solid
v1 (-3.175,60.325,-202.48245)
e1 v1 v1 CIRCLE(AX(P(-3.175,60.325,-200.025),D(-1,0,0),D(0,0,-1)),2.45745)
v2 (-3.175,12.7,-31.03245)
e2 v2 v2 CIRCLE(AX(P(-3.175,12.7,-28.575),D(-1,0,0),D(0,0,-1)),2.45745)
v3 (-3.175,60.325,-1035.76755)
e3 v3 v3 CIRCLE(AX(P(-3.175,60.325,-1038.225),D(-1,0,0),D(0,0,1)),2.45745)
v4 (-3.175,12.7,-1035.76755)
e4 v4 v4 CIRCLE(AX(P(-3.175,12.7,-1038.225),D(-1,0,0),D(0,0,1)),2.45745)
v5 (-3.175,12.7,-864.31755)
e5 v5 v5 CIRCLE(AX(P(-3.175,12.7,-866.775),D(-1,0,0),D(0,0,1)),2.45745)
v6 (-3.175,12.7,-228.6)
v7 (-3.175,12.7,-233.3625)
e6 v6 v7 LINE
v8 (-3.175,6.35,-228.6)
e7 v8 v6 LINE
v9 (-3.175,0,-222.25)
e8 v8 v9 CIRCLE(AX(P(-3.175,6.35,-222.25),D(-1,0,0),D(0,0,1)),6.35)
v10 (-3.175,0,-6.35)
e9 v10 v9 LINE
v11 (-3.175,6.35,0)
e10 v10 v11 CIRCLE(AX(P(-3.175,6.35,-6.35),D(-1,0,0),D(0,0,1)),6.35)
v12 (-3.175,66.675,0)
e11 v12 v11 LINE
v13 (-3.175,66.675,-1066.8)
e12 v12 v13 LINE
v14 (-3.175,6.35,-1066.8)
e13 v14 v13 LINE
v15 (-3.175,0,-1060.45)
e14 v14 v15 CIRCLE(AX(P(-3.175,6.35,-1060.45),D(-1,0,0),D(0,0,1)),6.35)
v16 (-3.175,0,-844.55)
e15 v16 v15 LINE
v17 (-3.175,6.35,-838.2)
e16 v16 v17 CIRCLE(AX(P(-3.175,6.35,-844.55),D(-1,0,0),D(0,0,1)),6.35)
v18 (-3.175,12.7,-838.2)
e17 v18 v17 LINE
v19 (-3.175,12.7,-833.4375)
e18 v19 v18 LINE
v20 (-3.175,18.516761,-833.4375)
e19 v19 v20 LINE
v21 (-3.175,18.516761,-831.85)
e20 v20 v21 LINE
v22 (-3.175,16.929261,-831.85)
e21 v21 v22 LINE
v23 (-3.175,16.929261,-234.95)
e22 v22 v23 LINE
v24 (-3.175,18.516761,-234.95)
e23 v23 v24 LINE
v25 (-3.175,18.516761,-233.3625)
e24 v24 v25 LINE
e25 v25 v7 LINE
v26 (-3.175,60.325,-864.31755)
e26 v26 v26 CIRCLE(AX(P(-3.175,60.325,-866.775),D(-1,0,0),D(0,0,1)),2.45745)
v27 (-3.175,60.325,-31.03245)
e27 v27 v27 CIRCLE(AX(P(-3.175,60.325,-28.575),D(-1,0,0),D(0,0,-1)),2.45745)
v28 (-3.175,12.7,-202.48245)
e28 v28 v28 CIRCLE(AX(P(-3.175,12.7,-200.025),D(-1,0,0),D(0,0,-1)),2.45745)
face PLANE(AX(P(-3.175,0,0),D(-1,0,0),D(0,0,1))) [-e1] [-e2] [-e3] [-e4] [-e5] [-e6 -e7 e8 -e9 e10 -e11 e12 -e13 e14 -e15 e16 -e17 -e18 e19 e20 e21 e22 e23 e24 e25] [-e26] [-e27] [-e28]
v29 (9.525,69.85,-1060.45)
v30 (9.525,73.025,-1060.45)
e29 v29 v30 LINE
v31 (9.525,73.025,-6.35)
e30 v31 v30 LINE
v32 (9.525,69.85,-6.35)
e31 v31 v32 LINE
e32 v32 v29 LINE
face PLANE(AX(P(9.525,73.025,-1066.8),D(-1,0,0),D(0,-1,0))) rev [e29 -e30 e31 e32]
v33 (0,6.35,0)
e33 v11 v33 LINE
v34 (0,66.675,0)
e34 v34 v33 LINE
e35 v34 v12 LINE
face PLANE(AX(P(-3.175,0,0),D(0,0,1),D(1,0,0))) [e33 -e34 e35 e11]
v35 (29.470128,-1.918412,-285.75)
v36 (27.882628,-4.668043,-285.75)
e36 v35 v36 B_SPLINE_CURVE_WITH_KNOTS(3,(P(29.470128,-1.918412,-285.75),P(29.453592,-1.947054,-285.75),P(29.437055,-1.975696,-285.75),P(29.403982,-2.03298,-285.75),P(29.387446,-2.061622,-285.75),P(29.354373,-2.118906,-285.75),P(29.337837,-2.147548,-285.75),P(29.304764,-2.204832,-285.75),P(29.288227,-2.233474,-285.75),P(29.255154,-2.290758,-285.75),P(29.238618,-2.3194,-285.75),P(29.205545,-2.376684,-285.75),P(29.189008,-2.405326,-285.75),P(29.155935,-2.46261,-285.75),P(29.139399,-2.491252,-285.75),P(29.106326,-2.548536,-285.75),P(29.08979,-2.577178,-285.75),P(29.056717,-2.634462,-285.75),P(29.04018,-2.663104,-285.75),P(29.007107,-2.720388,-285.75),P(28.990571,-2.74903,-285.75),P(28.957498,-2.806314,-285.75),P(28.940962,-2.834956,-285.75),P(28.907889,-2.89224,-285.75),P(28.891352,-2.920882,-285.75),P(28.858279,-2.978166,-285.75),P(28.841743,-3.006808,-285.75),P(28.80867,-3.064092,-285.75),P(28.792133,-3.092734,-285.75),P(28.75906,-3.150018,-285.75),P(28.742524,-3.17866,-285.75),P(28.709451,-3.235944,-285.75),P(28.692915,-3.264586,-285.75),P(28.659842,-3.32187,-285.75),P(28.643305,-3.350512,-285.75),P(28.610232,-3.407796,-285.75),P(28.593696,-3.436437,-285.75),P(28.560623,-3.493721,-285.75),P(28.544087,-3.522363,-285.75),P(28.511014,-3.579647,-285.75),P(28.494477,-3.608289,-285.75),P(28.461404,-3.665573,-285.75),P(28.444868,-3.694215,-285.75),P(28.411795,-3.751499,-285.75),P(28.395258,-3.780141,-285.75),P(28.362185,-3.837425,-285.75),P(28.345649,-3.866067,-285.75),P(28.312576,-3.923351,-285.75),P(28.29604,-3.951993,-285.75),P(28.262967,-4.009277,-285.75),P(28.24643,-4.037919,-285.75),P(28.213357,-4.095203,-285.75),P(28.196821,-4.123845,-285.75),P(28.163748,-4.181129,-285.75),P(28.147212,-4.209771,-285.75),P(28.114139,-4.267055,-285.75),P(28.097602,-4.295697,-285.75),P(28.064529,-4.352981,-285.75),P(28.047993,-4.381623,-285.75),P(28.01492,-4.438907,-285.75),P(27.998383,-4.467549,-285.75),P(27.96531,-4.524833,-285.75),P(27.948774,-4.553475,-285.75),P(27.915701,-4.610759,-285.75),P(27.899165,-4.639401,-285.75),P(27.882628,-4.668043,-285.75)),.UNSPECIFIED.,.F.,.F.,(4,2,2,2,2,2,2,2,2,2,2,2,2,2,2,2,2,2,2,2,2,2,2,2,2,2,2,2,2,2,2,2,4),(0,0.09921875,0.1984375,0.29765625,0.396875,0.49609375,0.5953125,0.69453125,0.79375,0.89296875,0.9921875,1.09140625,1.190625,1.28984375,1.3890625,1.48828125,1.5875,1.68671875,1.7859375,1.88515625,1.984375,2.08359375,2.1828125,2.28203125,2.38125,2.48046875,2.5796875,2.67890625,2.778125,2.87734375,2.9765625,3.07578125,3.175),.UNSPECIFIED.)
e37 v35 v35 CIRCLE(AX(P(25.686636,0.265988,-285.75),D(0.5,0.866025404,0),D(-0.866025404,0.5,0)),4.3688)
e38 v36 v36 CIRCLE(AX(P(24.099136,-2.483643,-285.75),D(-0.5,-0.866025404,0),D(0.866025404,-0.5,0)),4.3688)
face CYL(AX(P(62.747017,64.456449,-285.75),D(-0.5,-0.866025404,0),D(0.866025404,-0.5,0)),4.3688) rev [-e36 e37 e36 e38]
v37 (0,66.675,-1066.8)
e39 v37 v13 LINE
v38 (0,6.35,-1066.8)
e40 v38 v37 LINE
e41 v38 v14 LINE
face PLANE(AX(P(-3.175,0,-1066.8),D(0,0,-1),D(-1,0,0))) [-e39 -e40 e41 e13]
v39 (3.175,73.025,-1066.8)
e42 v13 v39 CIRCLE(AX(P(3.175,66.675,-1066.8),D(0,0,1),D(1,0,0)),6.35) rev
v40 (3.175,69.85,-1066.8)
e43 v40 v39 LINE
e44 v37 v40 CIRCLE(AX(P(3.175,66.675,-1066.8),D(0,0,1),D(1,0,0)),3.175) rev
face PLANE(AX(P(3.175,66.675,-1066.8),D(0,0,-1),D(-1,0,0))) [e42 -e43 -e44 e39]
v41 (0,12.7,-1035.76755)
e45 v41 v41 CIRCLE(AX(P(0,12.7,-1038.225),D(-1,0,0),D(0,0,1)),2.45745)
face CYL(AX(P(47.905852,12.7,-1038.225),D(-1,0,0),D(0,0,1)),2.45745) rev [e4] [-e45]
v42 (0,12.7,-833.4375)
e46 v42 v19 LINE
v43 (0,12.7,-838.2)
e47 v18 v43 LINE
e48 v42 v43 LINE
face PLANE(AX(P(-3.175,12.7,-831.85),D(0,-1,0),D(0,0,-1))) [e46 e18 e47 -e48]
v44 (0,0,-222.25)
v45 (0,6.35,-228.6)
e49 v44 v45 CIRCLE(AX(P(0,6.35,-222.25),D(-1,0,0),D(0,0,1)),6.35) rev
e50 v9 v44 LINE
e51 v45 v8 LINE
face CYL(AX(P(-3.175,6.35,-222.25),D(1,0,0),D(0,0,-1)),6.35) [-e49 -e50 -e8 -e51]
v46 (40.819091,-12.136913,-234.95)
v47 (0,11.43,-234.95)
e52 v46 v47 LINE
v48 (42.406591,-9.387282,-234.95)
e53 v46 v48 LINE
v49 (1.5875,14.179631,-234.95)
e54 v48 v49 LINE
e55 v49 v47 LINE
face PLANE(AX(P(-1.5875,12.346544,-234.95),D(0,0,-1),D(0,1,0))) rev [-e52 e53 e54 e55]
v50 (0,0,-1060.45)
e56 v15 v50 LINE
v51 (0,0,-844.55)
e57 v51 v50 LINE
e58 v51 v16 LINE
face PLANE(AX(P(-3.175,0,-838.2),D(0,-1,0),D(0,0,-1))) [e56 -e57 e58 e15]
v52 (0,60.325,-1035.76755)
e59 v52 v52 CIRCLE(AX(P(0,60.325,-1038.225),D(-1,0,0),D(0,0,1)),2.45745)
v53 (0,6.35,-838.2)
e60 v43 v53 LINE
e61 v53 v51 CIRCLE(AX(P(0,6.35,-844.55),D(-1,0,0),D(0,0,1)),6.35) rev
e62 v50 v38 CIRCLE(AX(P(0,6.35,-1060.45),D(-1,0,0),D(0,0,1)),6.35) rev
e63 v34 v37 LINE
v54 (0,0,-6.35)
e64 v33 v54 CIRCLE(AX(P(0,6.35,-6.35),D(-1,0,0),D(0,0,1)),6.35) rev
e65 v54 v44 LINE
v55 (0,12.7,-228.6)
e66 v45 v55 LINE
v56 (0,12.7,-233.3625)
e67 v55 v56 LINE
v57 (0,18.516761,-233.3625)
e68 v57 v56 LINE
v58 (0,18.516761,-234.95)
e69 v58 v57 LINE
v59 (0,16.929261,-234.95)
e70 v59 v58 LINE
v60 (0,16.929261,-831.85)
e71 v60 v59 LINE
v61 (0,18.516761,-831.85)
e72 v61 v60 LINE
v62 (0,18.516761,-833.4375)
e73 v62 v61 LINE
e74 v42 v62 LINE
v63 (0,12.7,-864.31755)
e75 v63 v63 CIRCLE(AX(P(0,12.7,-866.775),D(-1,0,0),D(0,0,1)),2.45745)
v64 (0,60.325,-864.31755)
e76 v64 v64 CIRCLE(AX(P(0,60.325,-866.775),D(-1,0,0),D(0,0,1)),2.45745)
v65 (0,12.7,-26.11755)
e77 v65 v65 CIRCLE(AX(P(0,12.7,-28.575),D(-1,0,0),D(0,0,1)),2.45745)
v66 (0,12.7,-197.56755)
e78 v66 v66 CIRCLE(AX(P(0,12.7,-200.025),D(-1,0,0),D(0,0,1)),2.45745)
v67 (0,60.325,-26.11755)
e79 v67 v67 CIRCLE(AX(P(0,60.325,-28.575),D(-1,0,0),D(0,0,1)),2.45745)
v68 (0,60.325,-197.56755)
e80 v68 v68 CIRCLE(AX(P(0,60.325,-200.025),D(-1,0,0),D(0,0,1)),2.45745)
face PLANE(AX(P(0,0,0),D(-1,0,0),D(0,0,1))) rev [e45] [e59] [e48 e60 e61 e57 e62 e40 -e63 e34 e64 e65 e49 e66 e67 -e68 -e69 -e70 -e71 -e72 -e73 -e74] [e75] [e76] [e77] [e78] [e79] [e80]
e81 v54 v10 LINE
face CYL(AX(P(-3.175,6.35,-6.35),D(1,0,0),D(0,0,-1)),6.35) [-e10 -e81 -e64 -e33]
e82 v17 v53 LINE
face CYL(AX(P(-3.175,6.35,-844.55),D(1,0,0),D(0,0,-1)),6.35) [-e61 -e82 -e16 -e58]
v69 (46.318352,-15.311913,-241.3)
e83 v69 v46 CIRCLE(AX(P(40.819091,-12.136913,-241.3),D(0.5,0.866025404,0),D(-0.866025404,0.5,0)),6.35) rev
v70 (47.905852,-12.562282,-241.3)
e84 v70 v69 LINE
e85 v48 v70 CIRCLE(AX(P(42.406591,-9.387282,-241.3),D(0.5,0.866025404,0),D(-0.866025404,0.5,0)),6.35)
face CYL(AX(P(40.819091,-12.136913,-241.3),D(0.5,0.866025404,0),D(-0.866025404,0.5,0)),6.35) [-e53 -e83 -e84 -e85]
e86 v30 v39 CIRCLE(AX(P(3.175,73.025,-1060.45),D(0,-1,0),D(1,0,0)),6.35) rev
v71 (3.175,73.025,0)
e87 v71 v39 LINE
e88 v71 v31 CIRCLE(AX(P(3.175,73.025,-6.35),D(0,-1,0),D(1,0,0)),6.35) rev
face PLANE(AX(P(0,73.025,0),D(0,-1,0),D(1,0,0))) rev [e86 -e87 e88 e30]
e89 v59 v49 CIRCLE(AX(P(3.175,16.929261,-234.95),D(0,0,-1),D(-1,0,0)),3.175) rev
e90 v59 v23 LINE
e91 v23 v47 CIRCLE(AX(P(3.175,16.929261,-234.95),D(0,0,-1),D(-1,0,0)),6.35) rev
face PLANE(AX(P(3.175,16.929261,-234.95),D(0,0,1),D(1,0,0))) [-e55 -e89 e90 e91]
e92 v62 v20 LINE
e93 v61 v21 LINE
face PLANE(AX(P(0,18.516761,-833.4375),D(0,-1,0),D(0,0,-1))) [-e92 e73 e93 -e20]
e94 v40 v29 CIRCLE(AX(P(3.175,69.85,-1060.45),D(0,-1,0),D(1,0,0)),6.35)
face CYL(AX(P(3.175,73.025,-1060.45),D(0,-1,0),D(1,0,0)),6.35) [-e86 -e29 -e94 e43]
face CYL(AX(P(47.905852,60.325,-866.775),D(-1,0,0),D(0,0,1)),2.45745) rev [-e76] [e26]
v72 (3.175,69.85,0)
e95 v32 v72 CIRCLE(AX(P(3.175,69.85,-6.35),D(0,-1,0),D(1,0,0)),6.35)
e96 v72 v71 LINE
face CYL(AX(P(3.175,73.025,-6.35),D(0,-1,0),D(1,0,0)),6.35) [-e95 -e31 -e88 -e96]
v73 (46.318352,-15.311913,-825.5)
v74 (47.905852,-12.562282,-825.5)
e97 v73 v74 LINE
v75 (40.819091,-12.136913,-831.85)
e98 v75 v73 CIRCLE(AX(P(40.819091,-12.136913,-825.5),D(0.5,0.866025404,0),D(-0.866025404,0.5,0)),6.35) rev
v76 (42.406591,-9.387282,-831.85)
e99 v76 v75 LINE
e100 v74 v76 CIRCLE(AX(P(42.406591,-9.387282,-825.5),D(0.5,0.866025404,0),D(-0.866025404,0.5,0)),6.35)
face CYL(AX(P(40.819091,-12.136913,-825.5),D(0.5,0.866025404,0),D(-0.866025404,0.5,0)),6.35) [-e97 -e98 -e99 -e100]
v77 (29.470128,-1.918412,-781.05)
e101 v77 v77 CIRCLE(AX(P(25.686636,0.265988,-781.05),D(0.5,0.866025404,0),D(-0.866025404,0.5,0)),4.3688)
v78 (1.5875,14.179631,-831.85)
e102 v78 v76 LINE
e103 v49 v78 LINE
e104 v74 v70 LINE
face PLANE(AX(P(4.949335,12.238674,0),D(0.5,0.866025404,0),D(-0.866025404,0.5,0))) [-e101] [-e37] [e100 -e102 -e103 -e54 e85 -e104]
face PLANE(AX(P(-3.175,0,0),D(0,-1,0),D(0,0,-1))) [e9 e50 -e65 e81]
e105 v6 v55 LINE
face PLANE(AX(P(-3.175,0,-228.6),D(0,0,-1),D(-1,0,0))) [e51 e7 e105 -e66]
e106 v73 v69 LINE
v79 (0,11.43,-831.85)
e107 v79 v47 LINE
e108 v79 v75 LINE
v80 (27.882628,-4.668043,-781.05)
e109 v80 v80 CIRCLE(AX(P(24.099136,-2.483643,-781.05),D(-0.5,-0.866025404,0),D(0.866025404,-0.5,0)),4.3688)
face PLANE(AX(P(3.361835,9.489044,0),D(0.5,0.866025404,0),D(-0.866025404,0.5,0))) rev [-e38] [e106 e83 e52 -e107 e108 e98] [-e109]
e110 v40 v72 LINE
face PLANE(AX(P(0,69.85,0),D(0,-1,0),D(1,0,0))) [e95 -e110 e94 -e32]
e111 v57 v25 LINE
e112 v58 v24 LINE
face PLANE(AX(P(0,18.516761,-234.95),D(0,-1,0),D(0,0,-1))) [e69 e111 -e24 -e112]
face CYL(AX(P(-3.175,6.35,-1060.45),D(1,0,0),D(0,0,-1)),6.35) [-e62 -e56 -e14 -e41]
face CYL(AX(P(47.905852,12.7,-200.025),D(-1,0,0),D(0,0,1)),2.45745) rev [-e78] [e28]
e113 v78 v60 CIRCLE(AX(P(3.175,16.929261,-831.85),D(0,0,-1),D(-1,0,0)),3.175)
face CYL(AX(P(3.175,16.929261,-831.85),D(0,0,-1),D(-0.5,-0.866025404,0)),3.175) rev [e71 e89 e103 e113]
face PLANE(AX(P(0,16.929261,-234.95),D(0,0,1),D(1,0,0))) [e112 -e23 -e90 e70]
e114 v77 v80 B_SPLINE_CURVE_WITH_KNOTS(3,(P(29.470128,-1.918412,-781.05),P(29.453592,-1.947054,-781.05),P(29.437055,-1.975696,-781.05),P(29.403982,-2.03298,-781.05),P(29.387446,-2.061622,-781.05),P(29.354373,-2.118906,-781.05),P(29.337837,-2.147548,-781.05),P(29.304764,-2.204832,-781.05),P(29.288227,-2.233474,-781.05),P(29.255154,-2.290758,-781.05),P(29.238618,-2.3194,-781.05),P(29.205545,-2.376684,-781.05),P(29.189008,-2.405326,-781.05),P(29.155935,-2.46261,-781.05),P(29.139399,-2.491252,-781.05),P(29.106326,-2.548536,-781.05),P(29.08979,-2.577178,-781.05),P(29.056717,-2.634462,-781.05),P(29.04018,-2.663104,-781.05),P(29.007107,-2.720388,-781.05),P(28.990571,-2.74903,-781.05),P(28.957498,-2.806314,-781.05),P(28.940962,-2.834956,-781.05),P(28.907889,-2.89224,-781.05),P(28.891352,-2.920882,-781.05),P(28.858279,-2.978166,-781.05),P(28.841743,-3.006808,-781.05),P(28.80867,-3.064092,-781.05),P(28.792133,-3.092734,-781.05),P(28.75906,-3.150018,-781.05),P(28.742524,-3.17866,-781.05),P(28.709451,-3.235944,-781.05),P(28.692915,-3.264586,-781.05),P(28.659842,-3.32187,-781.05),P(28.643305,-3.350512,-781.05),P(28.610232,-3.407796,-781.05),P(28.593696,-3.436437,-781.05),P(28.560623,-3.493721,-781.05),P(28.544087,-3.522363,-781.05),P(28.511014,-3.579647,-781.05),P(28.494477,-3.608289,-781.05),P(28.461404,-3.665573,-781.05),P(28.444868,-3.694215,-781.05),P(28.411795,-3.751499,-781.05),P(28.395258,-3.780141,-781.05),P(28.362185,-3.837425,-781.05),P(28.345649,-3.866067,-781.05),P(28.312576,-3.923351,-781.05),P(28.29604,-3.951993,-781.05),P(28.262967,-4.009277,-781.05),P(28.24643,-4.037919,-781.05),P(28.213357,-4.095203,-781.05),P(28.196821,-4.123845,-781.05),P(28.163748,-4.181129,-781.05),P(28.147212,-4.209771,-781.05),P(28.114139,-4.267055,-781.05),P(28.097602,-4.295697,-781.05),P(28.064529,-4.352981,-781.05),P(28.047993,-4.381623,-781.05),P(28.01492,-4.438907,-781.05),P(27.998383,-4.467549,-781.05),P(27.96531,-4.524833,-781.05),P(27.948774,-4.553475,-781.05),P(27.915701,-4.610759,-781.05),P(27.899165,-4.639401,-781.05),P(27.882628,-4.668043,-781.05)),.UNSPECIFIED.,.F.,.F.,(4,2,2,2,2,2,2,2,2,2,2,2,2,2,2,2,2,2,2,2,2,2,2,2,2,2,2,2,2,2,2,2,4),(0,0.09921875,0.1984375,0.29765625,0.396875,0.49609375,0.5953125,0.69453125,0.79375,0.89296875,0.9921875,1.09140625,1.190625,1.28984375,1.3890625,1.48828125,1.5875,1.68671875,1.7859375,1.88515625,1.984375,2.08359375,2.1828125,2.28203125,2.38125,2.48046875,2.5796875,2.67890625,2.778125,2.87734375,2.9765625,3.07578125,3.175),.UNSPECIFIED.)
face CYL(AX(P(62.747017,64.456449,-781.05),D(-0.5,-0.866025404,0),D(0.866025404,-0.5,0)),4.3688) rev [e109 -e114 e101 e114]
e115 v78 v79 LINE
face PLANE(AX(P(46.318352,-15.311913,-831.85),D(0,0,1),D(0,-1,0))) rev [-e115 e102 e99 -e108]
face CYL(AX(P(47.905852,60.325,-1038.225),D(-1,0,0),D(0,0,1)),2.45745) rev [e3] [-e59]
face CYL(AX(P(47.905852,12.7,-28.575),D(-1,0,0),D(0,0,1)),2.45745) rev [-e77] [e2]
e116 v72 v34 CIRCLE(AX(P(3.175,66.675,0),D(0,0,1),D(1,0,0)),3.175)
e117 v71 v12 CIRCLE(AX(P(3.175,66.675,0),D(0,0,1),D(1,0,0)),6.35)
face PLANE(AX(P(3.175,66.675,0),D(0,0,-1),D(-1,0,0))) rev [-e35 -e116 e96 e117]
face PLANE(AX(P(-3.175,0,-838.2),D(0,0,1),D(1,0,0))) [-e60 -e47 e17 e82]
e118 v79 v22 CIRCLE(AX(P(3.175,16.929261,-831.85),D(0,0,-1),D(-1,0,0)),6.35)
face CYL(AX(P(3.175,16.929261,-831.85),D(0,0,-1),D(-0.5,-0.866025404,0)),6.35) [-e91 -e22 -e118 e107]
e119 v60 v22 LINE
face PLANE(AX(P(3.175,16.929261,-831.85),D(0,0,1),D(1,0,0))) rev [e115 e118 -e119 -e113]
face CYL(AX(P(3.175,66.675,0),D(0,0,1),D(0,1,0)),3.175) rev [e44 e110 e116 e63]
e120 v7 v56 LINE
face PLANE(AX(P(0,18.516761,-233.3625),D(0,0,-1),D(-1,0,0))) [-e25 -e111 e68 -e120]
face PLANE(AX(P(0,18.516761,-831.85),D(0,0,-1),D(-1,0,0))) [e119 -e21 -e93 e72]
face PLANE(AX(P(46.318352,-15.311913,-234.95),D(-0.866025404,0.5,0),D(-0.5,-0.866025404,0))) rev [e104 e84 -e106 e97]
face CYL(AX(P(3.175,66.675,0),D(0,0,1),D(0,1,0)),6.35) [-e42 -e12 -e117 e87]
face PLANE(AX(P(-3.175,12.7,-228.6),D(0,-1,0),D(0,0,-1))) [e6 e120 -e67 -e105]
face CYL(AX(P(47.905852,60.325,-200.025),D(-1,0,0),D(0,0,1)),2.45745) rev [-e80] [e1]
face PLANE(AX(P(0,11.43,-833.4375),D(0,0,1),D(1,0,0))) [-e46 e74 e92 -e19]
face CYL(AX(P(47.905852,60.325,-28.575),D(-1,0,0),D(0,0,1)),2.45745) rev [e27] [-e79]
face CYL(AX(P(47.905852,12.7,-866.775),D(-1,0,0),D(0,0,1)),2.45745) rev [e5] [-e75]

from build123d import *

# Parameters (mm, degrees)
BASE_FLANGE1_DEPTH           = 3.175
EDGE_FLANGE1_START           = -833.4375
EDGE_FLANGE1_DEPTH           = 600.075
EDGE_FLANGE1_2_DEPTH         = 1.5875
EDGE_FLANGE1_START_2         = -234.95
EDGE_FLANGE1_3_DEPTH         = 1.5875
EDGE_FLANGE1_START_3         = -831.85
EDGE_FLANGE1_4_DEPTH         = 596.9
SKETCH10_R                   = 4.3688
CUT_EXTRUDE1_DEPTH           = 1070.608165207
SKETCH11_R                   = 2.45745
CUT_EXTRUDE2_DEPTH           = 1071.515830826
EDGE_FLANGE2_STRIP_W         = 19.05
EDGE_FLANGE2_STRIP_H         = 3.175
EDGE_FLANGE2_STRIP_CUT_DEPTH = 1066.8
EDGE_FLANGE2_DEPTH           = 1066.8
FILLET1_R                    = 6.35


# Read off the part's stored shape, not the designer's step: Edge-Flange1
# Sheet-metal steps are written as plain solids
with BuildPart() as part:
    # Sketch1 → Base-Flange1 (new body)
    with BuildSketch(Plane(origin=(0, 0, 0), x_dir=(0, 0, -1), z_dir=(1, 0, 0))):
        Polygon((838.2, 0), (1066.8, 0), (1066.8, 73.025), (0, 73.025), (0, 0), (228.6, 0), (228.6, 12.7), (234.95, 12.7), (234.95, 11.43), (831.85, 11.43), (831.85, 12.7), (838.2, 12.7), align=None)
    extrude(amount=-BASE_FLANGE1_DEPTH)

    # Edge-Flange1 outline → Edge-Flange1 (cut)
    with BuildSketch(Plane.XY.offset(EDGE_FLANGE1_START)):
        with BuildLine():
            Line((-3.175, 16.929261314), (-3.175, 11.43))
            Line((-3.175, 11.43), (0, 11.43))
            ThreePointArc((0, 11.43), (-2.324261314, 13.754261314), (-3.175, 16.929261314))
        make_face()
    extrude(amount=EDGE_FLANGE1_DEPTH, mode=Mode.SUBTRACT)

    # Edge-Flange1 2 outline → Edge-Flange1 2 (cut)
    with BuildSketch(Plane.XY.offset(EDGE_FLANGE1_START)):
        with BuildLine():
            Line((0, 18.516761314), (-3.175, 18.516761314))
            Line((-3.175, 18.516761314), (-3.175, 16.929261314))
            ThreePointArc((-3.175, 16.929261314), (-2.757968249, 14.665992052), (-1.561649527, 12.7))
            Line((-1.561649527, 12.7), (0, 12.7))
            Line((0, 12.7), (0, 18.516761314))
        make_face()
    extrude(amount=EDGE_FLANGE1_2_DEPTH, mode=Mode.SUBTRACT)

    # Edge-Flange1 3 outline → Edge-Flange1 3 (cut)
    with BuildSketch(Plane.XY.offset(EDGE_FLANGE1_START_2)):
        with BuildLine():
            Line((0, 18.516761314), (-3.175, 18.516761314))
            Line((-3.175, 18.516761314), (-3.175, 16.929261314))
            ThreePointArc((-3.175, 16.929261314), (-2.757968249, 14.665992052), (-1.561649527, 12.7))
            Line((-1.561649527, 12.7), (0, 12.7))
            Line((0, 12.7), (0, 18.516761314))
        make_face()
    extrude(amount=EDGE_FLANGE1_3_DEPTH, mode=Mode.SUBTRACT)

    # Edge-Flange1 4 outline → Edge-Flange1 4 (add)
    with BuildSketch(Plane.XY.offset(EDGE_FLANGE1_START_3)):
        with BuildLine():
            ThreePointArc((1.5875, 14.179630657), (0.425369343, 15.341761314), (0, 16.929261314))
            Line((0, 16.929261314), (0, 11.43))
            Line((0, 11.43), (46.318351826, -15.311912895))
            Line((46.318351826, -15.311912895), (47.905851826, -12.562282238))
            Line((47.905851826, -12.562282238), (1.5875, 14.179630657))
        make_face()
    extrude(amount=EDGE_FLANGE1_4_DEPTH)

    # Sketch10 → Cut-Extrude1 (cut, through all)
    with BuildSketch(Plane(origin=(4.949335183, 8.5725, 0), x_dir=(0.8660254037844364, -0.5000000000000041, 0), z_dir=(-0.500000000000004, -0.8660254037844363, 0))):
        with Locations((22.112285791, -285.75)):
            Circle(SKETCH10_R)
        with Locations((22.112285791, -781.05)):
            Circle(SKETCH10_R)
    extrude(amount=-CUT_EXTRUDE1_DEPTH, mode=Mode.SUBTRACT)

    # Sketch11 → Cut-Extrude2 (cut, through all)
    with BuildSketch(Plane.ZY.offset(3.175)):
        with Locations((-1038.225, 60.325)):
            Circle(SKETCH11_R)
        with Locations((-866.775, 60.325)):
            Circle(SKETCH11_R)
        with Locations((-1038.225, 12.7)):
            Circle(SKETCH11_R)
        with Locations((-866.775, 12.7)):
            Circle(SKETCH11_R)
        with Locations((-200.025, 60.325)):
            Circle(SKETCH11_R)
        with Locations((-200.025, 12.7)):
            Circle(SKETCH11_R)
        with Locations((-28.575, 12.7)):
            Circle(SKETCH11_R)
        with Locations((-28.575, 60.325)):
            Circle(SKETCH11_R)
    extrude(amount=-CUT_EXTRUDE2_DEPTH, mode=Mode.SUBTRACT)

    # Edge-Flange2 strip (across the edge) → Edge-Flange2 strip cut (cut)
    with BuildSketch(Plane(origin=(0, 73.025, -1066.8), x_dir=(0, -1, 0), z_dir=(0, 0, 1))):
        with Locations((-3.175, -1.5875)):
            Rectangle(EDGE_FLANGE2_STRIP_W, EDGE_FLANGE2_STRIP_H)
    extrude(amount=EDGE_FLANGE2_STRIP_CUT_DEPTH, mode=Mode.SUBTRACT)

    # Edge-Flange2 section (across the edge) → Edge-Flange2 (add)
    with BuildSketch(Plane(origin=(0, 73.025, -1066.8), x_dir=(0, -1, 0), z_dir=(0, 0, 1))):
        with BuildLine():
            Line((0, 3.175), (0, 9.525))
            Line((0, 9.525), (3.175, 9.525))
            Line((3.175, 9.525), (3.175, 3.175))
            ThreePointArc((3.175, 3.175), (4.10493597, 0.92993597), (6.35, 0))
            Line((6.35, 0), (6.35, -3.175))
            ThreePointArc((6.35, -3.175), (1.859871939, -1.315128061), (0, 3.175))
        make_face()
    extrude(amount=EDGE_FLANGE2_DEPTH)

    # Fillet1
    fillet1_edges = [part.edges().sort_by_distance(p)[0] for p in [
        (-1.5875, 0, 0),
        (47.112101826, -13.937097567, -234.95),
        (-1.5875, 0, -228.6),
        (47.112101826, -13.937097567, -831.85),
        (-1.5875, 0, -838.2),
        (-1.5875, 0, -1066.8),
        (9.525, 71.4375, 0),
        (9.525, 71.4375, -1066.8),
    ]]
    fillet(fillet1_edges, radius=FILLET1_R)


solid = part.part
